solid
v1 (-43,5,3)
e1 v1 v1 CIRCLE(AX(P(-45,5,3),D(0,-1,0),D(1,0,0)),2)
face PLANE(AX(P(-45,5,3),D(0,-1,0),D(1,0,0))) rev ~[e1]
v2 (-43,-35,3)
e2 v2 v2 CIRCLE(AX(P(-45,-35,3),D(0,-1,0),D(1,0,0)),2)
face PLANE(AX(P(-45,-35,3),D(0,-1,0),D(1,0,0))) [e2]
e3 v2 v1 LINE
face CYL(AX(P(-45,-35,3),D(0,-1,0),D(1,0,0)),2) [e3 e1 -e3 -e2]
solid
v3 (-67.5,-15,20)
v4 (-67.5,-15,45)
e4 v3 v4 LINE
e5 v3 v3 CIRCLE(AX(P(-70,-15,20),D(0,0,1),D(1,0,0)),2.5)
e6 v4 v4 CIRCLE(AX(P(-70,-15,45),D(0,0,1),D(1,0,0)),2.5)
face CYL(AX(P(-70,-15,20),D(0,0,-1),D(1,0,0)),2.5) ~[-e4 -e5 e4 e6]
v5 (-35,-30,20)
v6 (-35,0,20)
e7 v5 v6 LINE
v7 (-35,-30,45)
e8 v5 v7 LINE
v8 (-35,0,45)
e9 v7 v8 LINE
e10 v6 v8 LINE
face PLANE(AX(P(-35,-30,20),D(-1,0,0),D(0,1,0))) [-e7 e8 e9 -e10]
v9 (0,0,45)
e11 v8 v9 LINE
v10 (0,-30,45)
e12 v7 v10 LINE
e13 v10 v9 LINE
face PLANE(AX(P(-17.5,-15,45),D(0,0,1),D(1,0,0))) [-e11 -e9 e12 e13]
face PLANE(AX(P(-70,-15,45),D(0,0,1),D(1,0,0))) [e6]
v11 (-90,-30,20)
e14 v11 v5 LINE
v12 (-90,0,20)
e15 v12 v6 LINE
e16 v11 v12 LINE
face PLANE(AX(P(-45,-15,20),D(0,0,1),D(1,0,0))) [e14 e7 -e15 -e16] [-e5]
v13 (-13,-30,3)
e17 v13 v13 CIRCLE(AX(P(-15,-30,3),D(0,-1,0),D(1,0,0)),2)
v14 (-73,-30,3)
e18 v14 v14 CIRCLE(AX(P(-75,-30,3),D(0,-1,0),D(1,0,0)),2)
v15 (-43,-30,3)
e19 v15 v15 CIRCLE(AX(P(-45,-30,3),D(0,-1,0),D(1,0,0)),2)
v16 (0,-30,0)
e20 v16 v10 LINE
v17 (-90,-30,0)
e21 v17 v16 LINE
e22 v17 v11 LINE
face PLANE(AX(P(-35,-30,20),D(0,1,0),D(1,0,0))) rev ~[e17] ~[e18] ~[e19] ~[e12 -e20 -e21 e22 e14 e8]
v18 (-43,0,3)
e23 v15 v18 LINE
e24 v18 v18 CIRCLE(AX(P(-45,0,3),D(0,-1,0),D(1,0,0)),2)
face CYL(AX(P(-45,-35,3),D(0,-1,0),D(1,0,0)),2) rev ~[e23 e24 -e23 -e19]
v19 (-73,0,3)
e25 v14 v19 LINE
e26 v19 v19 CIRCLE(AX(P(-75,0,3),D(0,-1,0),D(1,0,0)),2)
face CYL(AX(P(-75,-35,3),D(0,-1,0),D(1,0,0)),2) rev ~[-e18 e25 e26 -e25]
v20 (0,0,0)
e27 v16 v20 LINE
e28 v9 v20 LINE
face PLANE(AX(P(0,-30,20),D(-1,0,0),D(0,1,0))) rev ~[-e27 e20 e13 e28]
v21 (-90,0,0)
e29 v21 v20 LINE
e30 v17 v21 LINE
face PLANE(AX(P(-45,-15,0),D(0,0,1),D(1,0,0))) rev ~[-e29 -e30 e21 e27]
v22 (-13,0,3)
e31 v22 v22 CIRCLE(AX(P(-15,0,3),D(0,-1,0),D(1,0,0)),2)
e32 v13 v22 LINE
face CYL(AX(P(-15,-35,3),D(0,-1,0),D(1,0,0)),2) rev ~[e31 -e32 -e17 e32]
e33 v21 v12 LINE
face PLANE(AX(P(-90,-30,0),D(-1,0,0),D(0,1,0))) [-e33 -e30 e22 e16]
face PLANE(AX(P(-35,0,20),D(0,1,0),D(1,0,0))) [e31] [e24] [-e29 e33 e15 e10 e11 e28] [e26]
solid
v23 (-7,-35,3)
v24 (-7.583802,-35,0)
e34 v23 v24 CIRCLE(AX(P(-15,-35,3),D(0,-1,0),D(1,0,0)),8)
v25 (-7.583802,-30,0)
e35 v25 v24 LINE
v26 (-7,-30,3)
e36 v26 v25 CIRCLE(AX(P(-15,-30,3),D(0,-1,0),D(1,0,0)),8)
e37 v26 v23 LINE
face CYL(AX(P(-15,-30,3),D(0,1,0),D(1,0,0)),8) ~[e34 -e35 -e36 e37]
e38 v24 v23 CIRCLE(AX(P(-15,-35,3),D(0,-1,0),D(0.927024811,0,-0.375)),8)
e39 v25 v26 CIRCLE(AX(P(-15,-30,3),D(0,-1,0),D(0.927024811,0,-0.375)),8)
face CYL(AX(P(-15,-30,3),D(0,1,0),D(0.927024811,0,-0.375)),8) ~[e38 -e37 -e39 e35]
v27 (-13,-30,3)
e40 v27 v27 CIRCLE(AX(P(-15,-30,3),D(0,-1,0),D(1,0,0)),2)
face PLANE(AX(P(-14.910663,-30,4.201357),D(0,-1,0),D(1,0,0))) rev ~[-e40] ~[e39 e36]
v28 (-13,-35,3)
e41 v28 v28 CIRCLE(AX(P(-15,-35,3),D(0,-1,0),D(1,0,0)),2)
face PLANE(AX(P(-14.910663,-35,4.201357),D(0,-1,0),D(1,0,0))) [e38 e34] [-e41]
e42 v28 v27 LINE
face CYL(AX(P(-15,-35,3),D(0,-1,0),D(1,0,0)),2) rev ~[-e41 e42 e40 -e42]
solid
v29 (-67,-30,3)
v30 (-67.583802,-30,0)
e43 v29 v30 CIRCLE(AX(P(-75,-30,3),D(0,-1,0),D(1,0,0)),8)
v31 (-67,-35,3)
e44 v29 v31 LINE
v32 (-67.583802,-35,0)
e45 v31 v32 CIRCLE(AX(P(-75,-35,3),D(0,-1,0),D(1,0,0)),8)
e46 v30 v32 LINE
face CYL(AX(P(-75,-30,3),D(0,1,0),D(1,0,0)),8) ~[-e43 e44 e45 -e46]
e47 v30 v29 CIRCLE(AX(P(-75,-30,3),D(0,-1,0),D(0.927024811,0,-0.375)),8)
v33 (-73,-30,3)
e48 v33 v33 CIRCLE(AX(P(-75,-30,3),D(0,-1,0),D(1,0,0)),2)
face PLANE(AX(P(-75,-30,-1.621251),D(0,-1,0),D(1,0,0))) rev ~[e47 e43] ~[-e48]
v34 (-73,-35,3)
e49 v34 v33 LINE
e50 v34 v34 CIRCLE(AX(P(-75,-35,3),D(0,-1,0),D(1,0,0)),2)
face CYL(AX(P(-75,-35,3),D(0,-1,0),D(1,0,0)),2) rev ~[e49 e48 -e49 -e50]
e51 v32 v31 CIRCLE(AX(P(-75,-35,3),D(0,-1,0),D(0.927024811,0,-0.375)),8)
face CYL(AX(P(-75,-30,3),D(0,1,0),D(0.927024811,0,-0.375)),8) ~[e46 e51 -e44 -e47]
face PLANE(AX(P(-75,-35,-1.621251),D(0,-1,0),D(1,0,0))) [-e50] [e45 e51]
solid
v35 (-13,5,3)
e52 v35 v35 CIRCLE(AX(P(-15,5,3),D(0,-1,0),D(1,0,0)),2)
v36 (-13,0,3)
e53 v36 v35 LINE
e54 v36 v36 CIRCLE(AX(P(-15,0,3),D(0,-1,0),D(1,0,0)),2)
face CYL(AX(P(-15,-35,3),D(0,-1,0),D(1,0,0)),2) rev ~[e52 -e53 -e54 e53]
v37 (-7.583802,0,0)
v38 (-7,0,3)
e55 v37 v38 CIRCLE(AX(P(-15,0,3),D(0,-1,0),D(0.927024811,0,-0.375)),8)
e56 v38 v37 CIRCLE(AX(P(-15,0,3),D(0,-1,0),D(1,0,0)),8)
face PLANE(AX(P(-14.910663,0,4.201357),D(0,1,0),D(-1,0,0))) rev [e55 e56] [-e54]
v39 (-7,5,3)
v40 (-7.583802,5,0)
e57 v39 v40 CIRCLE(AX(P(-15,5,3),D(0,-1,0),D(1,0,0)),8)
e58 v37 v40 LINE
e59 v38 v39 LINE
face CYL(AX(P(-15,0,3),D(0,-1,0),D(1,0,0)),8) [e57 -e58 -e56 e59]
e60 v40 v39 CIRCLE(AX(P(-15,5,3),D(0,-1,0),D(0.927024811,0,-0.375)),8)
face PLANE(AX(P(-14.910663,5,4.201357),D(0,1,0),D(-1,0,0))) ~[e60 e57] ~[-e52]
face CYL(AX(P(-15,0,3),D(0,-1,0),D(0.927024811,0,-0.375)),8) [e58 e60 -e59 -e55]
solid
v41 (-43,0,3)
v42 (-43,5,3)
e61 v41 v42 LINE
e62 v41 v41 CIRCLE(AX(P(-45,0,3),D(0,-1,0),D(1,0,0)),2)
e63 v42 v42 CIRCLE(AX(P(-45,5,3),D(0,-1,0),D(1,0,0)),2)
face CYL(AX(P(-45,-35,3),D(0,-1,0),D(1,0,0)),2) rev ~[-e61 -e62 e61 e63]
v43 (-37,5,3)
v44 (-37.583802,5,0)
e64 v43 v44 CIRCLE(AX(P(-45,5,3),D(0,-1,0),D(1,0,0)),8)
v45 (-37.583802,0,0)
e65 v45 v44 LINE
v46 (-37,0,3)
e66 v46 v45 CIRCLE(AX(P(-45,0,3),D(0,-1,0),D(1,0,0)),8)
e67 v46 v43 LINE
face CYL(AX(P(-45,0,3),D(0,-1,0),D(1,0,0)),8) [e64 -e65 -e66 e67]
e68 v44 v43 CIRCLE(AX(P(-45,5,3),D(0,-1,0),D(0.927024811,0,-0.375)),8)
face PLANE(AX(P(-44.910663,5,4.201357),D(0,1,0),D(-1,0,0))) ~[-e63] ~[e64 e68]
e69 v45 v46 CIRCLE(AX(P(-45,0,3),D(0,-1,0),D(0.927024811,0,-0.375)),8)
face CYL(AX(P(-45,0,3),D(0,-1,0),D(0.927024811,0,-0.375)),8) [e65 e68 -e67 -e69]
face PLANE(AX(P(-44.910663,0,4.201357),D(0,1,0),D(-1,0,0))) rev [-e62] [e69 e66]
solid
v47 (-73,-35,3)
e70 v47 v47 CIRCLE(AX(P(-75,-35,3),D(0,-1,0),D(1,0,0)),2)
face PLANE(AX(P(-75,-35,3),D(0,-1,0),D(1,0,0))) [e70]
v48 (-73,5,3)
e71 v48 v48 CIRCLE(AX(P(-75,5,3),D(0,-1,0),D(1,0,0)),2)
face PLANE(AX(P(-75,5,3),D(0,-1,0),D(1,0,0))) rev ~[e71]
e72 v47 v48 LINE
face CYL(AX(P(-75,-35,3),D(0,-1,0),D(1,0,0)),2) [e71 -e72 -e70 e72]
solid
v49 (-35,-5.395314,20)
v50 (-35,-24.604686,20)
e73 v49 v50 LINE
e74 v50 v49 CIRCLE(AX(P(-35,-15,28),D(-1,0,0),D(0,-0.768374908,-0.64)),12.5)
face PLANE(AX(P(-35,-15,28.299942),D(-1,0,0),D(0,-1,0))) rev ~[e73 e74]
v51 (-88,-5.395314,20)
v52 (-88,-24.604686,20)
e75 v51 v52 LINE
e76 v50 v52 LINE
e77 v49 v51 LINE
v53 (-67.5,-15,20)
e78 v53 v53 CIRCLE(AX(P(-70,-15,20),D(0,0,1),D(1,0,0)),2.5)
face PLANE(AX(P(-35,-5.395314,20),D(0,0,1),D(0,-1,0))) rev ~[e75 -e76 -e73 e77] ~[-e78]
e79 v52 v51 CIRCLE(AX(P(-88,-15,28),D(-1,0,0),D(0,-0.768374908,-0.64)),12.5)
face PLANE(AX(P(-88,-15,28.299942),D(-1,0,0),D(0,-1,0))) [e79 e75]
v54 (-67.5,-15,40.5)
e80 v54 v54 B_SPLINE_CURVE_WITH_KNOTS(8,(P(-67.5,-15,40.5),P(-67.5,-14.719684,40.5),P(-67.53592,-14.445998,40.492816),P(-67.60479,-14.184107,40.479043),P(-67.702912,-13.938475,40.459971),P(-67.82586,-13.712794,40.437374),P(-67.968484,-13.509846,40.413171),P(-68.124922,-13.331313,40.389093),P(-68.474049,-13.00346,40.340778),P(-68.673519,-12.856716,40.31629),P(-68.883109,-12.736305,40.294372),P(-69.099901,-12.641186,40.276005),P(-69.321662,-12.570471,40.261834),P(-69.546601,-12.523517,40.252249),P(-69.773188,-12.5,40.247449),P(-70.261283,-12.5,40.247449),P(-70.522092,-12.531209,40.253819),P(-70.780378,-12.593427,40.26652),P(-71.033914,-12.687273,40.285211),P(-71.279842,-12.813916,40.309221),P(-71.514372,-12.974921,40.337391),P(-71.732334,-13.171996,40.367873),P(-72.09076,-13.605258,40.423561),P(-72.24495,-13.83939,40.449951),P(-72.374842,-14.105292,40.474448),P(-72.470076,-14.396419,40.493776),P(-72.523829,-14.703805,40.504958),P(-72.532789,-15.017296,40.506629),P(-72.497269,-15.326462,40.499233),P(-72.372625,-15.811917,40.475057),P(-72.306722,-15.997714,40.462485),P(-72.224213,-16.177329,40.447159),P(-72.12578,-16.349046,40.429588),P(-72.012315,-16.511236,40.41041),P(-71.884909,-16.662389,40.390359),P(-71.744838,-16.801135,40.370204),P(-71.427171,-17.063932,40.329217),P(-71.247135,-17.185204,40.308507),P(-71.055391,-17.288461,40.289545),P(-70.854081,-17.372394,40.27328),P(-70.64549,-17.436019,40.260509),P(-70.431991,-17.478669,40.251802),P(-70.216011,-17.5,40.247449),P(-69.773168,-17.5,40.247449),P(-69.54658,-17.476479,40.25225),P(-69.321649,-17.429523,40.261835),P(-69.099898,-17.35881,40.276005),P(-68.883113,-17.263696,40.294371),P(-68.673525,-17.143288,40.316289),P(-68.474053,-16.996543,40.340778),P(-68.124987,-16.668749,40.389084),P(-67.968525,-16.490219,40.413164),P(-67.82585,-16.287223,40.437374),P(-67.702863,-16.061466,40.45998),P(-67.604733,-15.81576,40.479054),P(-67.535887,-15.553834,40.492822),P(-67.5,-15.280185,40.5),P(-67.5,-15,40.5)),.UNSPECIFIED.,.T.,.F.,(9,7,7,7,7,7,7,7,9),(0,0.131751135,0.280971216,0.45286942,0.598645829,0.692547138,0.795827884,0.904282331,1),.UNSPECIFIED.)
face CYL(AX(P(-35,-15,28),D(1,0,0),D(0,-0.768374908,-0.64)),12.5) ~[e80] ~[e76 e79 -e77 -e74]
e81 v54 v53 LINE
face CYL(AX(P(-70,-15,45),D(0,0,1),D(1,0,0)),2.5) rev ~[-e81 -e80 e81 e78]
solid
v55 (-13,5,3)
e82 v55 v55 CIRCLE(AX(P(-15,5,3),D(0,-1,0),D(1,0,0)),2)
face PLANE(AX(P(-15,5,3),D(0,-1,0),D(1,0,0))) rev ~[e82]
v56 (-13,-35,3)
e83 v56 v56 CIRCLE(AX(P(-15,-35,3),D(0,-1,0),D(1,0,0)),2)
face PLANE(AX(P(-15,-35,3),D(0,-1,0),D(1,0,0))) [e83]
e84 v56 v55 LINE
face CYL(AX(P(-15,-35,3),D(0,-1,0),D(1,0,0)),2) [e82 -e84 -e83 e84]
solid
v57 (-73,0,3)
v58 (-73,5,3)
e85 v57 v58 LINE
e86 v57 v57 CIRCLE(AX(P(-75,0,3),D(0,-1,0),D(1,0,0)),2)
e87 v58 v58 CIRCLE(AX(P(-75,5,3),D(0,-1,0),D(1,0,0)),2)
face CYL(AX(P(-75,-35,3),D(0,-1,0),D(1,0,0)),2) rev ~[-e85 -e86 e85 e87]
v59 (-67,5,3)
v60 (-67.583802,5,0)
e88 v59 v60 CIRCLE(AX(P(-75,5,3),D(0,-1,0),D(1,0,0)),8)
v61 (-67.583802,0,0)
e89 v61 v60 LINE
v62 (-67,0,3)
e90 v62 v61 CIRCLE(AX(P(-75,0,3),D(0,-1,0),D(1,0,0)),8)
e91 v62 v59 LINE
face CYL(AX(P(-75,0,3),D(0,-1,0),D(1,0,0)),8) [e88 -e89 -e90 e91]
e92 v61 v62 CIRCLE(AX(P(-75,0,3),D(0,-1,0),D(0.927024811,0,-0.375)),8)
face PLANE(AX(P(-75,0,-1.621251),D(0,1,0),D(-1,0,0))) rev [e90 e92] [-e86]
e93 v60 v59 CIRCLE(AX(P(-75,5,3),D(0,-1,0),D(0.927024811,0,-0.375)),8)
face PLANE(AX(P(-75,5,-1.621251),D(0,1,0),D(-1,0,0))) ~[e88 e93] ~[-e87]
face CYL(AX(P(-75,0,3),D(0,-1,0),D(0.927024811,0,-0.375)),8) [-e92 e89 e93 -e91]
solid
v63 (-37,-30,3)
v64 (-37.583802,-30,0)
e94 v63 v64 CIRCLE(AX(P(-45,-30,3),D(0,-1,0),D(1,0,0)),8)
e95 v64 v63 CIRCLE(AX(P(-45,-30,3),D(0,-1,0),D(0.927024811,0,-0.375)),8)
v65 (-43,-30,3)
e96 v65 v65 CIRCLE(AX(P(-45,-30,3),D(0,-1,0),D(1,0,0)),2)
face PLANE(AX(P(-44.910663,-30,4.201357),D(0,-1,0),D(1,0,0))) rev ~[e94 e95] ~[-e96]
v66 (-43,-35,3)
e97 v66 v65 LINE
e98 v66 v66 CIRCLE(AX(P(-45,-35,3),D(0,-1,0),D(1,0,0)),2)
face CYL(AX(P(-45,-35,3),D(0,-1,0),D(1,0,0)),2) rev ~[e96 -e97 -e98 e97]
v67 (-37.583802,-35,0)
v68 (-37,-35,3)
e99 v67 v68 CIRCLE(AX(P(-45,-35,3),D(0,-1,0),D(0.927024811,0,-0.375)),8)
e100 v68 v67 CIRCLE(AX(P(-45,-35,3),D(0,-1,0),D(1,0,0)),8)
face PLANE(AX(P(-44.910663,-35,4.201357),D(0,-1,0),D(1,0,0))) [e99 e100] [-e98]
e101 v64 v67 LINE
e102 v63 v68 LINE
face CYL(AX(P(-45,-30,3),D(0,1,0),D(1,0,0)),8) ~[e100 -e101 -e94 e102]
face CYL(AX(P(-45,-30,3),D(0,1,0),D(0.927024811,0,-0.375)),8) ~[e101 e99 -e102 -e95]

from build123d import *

# Parameters (mm, degrees)
F0_W      = 90
F0_H      = 30
F1_DEPTH  = 20
F2_W      = 35
F2_H      = 30
F3_DEPTH  = 25
F5_DEPTH  = 53
F6_R      = 2.5
F7_DEPTH  = 69.3
F8_R      = 2.5
F9_DEPTH  = 25
F11_DEPTH = 5
F14_R     = 2
F15_DEPTH = 56.1
F16_R     = 2
F17_DEPTH = 40


with BuildPart() as f1:
    # F0 (on Top) → F1 (new body)
    with BuildSketch(Plane.XY):
        with Locations((-45, -15)):
            Rectangle(F0_W, F0_H)
    extrude(amount=F1_DEPTH)

    # F2 (on face) → F3 (join)
    with BuildSketch(Plane.XY.offset(20)):
        with Locations((-17.5, -15)):
            Rectangle(F2_W, F2_H)
    extrude(amount=F3_DEPTH)

    # F8 (on face) → F9 (join)
    with BuildSketch(Plane.XY.offset(20)):
        with Locations((-70, -15)):
            Circle(F8_R)
    extrude(amount=F9_DEPTH)


with BuildPart() as f5:
    # F4 (on face) → F5 (new body)
    with BuildSketch(Plane(origin=(-35, 0, 0), x_dir=(0, -1, 0), z_dir=(-1, 0, 0))):
        with BuildLine():
            Line((5.3953136439, 20), (24.6046863561, 20))
            ThreePointArc((24.6046863561, 20), (15, 40.5), (5.3953136439, 20))
        make_face()
    extrude(amount=F5_DEPTH)

    # F6 (on face) → F7 (cut)
    with BuildSketch(Plane.XY.offset(45)):
        with Locations((-70, -15)):
            Circle(F6_R)
    extrude(amount=-F7_DEPTH, mode=Mode.SUBTRACT)


with BuildPart() as f11:
    # F10 (on face) → F11 (new body)
    with BuildSketch(Plane.XZ.offset(30)):
        with BuildLine():
            Line((-67.5838015129, 0), (-82.4161984871, 0))
            ThreePointArc((-82.4161984871, 0), (-75, -5), (-67.5838015129, 0))
        make_face()
        with BuildLine():
            ThreePointArc((-67.5838015129, 0), (-67.14730658, 1.4718619003), (-67, 3))
            ThreePointArc((-67, 3), (-76.5281380997, 10.85269342), (-82.4161984871, 0))
            Line((-82.4161984871, 0), (-67.5838015129, 0))
        make_face()
    extrude(amount=F11_DEPTH)


with BuildPart() as f11b:
    # F10 (on face) → F11, piece 2 (new body)
    with BuildSketch(Plane.XZ.offset(30)):
        with BuildLine():
            ThreePointArc((-37, 3), (-46.5281380997, 10.85269342), (-52.4161984871, 0))
            Line((-52.4161984871, 0), (-37.5838015129, 0))
            ThreePointArc((-37.5838015129, 0), (-37.14730658, 1.4718619003), (-37, 3))
        make_face()
        with BuildLine():
            Line((-37.5838015129, 0), (-52.4161984871, 0))
            ThreePointArc((-52.4161984871, 0), (-45, -5), (-37.5838015129, 0))
        make_face()
    extrude(amount=F11_DEPTH)


with BuildPart() as f11c:
    # F10 (on face) → F11, piece 3 (new body)
    with BuildSketch(Plane.XZ.offset(30)):
        with BuildLine():
            ThreePointArc((-7, 3), (-16.5281380997, 10.85269342), (-22.4161984871, 0))
            Line((-22.4161984871, 0), (-7.5838015129, 0))
            ThreePointArc((-7.5838015129, 0), (-7.14730658, 1.4718619003), (-7, 3))
        make_face()
        with BuildLine():
            Line((-7.5838015129, 0), (-22.4161984871, 0))
            ThreePointArc((-22.4161984871, 0), (-15, -5), (-7.5838015129, 0))
        make_face()
    extrude(amount=F11_DEPTH)


with BuildPart() as f13_1:
    # F13: instance of F11
    add(f11.part.mirror(Plane.XZ.offset(15)))


with BuildPart() as f13_2:
    # F13: instance of F11b
    add(f11b.part.mirror(Plane.XZ.offset(15)))


with BuildPart() as f13_3:
    # F13: instance of F11c
    add(f11c.part.mirror(Plane.XZ.offset(15)))


with BuildPart() as f15_tool:
    # F14 (on face) → F15 (new body)
    with BuildSketch(Plane.XZ.offset(35)):
        with Locations((-45, 3)):
            Circle(F14_R)
        with Locations((-15, 3)):
            Circle(F14_R)
        with Locations((-75, 3)):
            Circle(F14_R)
    extrude(amount=-F15_DEPTH)


with BuildPart() as f1_1:
    add(f1.part)

    # F15: cut by f15_tool
    add(f15_tool.part, mode=Mode.SUBTRACT)


with BuildPart() as f11_1:
    add(f11.part)

    # F15: cut by f15_tool
    add(f15_tool.part, mode=Mode.SUBTRACT)


with BuildPart() as f11b_1:
    add(f11b.part)

    # F15: cut by f15_tool
    add(f15_tool.part, mode=Mode.SUBTRACT)


with BuildPart() as f11c_1:
    add(f11c.part)

    # F15: cut by f15_tool
    add(f15_tool.part, mode=Mode.SUBTRACT)


with BuildPart() as f13_1_1:
    add(f13_1.part)

    # F15: cut by f15_tool
    add(f15_tool.part, mode=Mode.SUBTRACT)


with BuildPart() as f13_2_1:
    add(f13_2.part)

    # F15: cut by f15_tool
    add(f15_tool.part, mode=Mode.SUBTRACT)


with BuildPart() as f13_3_1:
    add(f13_3.part)

    # F15: cut by f15_tool
    add(f15_tool.part, mode=Mode.SUBTRACT)


with BuildPart() as f17:
    # F16 (on face) → F17 (new body, through all)
    with BuildSketch(Plane.XZ.offset(35)):
        with Locations((-75, 3)):
            Circle(F16_R)
    extrude(amount=-F17_DEPTH)


with BuildPart() as f17b:
    # F16 (on face) → F17, piece 2 (new body, through all)
    with BuildSketch(Plane.XZ.offset(35)):
        with Locations((-45, 3)):
            Circle(F16_R)
    extrude(amount=-F17_DEPTH)


with BuildPart() as f17c:
    # F16 (on face) → F17, piece 3 (new body, through all)
    with BuildSketch(Plane.XZ.offset(35)):
        with Locations((-15, 3)):
            Circle(F16_R)
    extrude(amount=-F17_DEPTH)


solid = Compound([f5.part, f1_1.part, f11_1.part, f11b_1.part, f11c_1.part, f13_1_1.part, f13_2_1.part, f13_3_1.part, f17.part, f17b.part, f17c.part])
